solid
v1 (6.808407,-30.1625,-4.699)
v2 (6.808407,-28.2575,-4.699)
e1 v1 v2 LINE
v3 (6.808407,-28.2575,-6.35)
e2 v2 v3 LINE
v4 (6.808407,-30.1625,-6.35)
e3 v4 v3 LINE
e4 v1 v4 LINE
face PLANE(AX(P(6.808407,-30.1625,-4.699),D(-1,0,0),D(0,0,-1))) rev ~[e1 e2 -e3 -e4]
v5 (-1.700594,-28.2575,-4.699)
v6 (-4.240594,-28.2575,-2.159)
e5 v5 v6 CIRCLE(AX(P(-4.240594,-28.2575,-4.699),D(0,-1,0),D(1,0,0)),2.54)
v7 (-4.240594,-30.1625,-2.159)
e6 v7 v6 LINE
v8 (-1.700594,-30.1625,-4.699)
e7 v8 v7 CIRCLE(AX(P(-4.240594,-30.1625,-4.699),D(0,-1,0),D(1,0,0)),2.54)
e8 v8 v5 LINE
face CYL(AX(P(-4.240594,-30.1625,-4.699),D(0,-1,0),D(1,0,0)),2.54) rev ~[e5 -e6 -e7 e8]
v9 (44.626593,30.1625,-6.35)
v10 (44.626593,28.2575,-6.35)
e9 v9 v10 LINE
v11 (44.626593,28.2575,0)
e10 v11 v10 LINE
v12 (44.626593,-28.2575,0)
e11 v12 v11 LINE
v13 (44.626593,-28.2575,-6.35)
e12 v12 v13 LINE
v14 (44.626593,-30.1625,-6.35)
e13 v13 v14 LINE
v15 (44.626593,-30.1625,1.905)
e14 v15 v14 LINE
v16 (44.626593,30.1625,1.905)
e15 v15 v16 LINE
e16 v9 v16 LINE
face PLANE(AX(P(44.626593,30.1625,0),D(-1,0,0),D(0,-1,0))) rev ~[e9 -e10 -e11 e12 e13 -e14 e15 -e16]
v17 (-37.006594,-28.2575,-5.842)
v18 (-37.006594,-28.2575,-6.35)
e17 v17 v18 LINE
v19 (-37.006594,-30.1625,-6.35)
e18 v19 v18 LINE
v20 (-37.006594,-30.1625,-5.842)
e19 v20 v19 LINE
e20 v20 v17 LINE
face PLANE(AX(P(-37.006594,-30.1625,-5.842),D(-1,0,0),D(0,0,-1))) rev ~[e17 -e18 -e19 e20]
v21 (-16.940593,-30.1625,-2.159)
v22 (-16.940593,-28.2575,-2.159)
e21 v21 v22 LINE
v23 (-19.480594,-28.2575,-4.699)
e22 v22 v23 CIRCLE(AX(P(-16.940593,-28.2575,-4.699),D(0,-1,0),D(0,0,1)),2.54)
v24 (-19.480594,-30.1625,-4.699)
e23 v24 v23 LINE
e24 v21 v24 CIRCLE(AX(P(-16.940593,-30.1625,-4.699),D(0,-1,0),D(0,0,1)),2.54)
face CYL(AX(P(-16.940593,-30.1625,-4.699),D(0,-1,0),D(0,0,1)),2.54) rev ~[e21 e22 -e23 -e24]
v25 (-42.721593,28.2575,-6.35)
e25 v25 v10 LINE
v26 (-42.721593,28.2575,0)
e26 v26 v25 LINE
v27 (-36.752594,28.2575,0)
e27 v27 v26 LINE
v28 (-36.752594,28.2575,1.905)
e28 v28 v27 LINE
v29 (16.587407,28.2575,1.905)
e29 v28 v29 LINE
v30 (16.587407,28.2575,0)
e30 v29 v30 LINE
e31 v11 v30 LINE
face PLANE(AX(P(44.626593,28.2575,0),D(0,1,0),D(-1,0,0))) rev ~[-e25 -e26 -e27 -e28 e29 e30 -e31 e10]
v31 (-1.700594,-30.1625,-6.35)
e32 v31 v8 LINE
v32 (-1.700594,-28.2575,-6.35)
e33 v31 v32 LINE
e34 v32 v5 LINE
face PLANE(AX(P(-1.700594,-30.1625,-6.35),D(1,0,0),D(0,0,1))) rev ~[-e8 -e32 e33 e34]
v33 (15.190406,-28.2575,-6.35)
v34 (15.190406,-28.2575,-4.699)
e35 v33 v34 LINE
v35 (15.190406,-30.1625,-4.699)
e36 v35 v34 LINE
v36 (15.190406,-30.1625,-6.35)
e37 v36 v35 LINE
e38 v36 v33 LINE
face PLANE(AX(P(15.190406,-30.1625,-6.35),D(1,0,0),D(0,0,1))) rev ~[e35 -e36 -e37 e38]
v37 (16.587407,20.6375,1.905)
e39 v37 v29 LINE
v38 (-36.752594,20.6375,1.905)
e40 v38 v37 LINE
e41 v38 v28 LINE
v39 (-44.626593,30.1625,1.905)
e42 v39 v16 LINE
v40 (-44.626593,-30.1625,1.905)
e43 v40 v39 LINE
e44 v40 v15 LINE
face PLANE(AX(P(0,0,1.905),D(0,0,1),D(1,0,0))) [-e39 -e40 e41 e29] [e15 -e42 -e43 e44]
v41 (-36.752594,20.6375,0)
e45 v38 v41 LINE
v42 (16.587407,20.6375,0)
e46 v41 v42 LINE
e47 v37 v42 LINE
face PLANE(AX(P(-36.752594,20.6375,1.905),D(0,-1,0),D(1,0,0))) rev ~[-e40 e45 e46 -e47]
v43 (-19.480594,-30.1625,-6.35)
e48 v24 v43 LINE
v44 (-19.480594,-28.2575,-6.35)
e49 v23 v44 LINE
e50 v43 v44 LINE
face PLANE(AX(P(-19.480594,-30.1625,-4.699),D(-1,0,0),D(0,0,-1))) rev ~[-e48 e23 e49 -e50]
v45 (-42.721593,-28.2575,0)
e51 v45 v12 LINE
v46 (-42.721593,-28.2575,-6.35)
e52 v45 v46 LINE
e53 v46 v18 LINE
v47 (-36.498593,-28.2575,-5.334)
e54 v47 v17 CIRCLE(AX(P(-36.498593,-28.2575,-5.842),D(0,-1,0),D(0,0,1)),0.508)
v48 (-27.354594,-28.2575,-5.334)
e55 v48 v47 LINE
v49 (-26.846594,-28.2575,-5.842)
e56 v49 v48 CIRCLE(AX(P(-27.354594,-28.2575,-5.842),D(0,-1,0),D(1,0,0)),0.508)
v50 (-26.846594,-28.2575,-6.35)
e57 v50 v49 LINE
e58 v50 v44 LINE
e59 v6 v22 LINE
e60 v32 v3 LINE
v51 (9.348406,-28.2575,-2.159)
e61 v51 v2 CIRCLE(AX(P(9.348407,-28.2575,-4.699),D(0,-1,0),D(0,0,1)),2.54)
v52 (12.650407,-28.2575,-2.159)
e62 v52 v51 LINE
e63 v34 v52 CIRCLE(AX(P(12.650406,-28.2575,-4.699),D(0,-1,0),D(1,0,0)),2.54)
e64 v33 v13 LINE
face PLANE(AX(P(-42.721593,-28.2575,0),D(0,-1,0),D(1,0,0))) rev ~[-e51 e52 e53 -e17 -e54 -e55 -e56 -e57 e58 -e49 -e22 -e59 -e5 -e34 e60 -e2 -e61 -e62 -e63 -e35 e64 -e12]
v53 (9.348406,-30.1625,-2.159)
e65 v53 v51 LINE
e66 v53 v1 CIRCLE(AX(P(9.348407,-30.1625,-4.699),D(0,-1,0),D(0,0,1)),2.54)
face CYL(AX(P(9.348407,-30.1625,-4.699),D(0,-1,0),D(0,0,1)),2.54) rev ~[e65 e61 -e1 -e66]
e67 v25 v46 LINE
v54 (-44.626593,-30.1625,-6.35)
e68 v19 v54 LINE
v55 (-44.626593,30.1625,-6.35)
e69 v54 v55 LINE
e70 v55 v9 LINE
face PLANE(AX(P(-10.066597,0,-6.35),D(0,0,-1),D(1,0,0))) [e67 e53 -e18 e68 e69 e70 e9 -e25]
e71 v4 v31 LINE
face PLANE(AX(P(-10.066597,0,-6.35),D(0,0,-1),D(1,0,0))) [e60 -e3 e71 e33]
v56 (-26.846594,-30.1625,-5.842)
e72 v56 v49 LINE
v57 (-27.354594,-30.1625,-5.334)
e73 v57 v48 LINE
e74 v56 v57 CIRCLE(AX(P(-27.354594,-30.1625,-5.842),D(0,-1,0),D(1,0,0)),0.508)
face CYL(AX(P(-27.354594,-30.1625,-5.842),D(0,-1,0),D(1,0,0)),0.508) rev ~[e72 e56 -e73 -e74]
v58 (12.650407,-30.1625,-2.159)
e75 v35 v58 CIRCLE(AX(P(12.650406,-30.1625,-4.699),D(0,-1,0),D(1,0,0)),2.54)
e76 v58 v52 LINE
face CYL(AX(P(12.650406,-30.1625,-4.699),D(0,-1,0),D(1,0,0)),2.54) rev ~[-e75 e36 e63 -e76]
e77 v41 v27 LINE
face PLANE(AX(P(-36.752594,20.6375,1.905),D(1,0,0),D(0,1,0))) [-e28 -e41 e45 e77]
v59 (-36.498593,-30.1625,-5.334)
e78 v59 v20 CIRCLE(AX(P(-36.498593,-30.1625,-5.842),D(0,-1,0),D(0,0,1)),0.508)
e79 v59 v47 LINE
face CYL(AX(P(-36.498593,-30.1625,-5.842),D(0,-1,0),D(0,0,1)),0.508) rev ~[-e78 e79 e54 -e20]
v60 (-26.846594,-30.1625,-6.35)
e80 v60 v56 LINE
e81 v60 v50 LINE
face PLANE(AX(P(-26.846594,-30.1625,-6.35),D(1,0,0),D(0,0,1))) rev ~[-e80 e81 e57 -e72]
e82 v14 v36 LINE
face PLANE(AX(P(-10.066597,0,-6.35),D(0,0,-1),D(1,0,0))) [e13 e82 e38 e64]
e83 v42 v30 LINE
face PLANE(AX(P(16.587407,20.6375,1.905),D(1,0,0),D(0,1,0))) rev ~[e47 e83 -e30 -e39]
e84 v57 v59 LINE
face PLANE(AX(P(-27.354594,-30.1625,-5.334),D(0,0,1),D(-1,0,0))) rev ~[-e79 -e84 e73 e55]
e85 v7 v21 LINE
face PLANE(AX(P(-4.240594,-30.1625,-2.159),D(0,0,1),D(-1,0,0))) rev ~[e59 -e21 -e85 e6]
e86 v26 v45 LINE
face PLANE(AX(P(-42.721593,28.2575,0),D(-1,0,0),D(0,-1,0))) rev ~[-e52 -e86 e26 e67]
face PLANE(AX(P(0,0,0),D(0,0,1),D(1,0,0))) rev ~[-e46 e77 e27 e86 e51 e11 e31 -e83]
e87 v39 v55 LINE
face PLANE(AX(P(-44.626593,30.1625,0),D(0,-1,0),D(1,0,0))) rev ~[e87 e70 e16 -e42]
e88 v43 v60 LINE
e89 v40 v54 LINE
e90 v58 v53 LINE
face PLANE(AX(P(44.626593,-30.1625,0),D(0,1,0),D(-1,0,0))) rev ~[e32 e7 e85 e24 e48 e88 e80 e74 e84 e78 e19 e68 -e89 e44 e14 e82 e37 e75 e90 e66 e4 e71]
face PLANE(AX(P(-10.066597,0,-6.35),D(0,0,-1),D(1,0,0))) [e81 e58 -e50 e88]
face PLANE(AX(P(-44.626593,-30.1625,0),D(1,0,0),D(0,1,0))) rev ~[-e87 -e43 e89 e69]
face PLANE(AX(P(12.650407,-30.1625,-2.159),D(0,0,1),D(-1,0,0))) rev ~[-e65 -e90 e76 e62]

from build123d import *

# Parameters (mm, degrees)
F0_W     = 89.253187
F0_H     = 60.325
F1_DEPTH = 1.905
F3_DEPTH = 6.35
F5_DEPTH = 25.4
F6_W     = 53.34
F6_H     = 7.62
F7_DEPTH = 25.4


# Not quite as in the source:
# - a feature names something its author has since deleted; it is built from what else it names


with BuildPart() as f1:
    # F0 (on Top) → F1 (new body)
    with BuildSketch(Plane.XY):
        Rectangle(F0_W, F0_H)
    extrude(amount=F1_DEPTH)

    # F2 (on face) → F3 (join)
    with BuildSketch(Plane(origin=(0, 0, 0), x_dir=(1, 0, 0), z_dir=(0, 0, -1))):
        Polygon((-42.7215935, -28.2575), (-42.7215935, 28.2575), (44.6265935, 28.2575), (44.6265935, 30.1625), (-44.6265935, 30.1625), (-44.6265935, -30.1625), (44.6265935, -30.1625), (44.6265935, -28.2575), align=None)
    extrude(amount=F3_DEPTH)

    # F4 (on face) → F5 (cut)
    with BuildSketch(Plane.XZ.offset(30.1625)):
        with BuildLine():
            Line((-37.0065935, -5.842), (-37.0065935, -6.35))
            Line((-37.0065935, -6.35), (-26.8465935, -6.35))
            Line((-26.8465935, -6.35), (-26.8465935, -5.842))
            ThreePointArc((-26.8465935, -5.842), (-26.9953832552, -5.4827897552), (-27.3545935, -5.334))
            Line((-27.3545935, -5.334), (-36.4985935, -5.334))
            ThreePointArc((-36.4985935, -5.334), (-36.8578037448, -5.4827897552), (-37.0065935, -5.842))
        make_face()
        with BuildLine():
            Line((-19.4805935, -4.699), (-19.4805935, -6.35))
            Line((-19.4805935, -6.35), (-1.7005935, -6.35))
            Line((-1.7005935, -6.35), (-1.7005935, -4.699))
            ThreePointArc((-1.7005935, -4.699), (-2.4445422758, -2.9029487758), (-4.2405935, -2.159))
            Line((-4.2405935, -2.159), (-16.9405935, -2.159))
            ThreePointArc((-16.9405935, -2.159), (-18.7366447242, -2.9029487758), (-19.4805935, -4.699))
        make_face()
        with BuildLine():
            Line((6.8084065, -4.699), (6.8084065, -6.35))
            Line((6.8084065, -6.35), (15.1904065, -6.35))
            Line((15.1904065, -6.35), (15.1904065, -4.699))
            ThreePointArc((15.1904065, -4.699), (14.4464577242, -2.9029487758), (12.6504065, -2.159))
            Line((12.6504065, -2.159), (9.3484065, -2.159))
            ThreePointArc((9.3484065, -2.159), (7.5523552758, -2.9029487758), (6.8084065, -4.699))
        make_face()
    extrude(amount=-F5_DEPTH, mode=Mode.SUBTRACT)

    # F6 (on face) → F7 (cut)
    with BuildSketch(Plane.XY.offset(1.905)):
        with Locations((-10.0825935, 24.4475)):
            Rectangle(F6_W, F6_H)
    extrude(amount=-F7_DEPTH, mode=Mode.SUBTRACT)


solid = f1.part
